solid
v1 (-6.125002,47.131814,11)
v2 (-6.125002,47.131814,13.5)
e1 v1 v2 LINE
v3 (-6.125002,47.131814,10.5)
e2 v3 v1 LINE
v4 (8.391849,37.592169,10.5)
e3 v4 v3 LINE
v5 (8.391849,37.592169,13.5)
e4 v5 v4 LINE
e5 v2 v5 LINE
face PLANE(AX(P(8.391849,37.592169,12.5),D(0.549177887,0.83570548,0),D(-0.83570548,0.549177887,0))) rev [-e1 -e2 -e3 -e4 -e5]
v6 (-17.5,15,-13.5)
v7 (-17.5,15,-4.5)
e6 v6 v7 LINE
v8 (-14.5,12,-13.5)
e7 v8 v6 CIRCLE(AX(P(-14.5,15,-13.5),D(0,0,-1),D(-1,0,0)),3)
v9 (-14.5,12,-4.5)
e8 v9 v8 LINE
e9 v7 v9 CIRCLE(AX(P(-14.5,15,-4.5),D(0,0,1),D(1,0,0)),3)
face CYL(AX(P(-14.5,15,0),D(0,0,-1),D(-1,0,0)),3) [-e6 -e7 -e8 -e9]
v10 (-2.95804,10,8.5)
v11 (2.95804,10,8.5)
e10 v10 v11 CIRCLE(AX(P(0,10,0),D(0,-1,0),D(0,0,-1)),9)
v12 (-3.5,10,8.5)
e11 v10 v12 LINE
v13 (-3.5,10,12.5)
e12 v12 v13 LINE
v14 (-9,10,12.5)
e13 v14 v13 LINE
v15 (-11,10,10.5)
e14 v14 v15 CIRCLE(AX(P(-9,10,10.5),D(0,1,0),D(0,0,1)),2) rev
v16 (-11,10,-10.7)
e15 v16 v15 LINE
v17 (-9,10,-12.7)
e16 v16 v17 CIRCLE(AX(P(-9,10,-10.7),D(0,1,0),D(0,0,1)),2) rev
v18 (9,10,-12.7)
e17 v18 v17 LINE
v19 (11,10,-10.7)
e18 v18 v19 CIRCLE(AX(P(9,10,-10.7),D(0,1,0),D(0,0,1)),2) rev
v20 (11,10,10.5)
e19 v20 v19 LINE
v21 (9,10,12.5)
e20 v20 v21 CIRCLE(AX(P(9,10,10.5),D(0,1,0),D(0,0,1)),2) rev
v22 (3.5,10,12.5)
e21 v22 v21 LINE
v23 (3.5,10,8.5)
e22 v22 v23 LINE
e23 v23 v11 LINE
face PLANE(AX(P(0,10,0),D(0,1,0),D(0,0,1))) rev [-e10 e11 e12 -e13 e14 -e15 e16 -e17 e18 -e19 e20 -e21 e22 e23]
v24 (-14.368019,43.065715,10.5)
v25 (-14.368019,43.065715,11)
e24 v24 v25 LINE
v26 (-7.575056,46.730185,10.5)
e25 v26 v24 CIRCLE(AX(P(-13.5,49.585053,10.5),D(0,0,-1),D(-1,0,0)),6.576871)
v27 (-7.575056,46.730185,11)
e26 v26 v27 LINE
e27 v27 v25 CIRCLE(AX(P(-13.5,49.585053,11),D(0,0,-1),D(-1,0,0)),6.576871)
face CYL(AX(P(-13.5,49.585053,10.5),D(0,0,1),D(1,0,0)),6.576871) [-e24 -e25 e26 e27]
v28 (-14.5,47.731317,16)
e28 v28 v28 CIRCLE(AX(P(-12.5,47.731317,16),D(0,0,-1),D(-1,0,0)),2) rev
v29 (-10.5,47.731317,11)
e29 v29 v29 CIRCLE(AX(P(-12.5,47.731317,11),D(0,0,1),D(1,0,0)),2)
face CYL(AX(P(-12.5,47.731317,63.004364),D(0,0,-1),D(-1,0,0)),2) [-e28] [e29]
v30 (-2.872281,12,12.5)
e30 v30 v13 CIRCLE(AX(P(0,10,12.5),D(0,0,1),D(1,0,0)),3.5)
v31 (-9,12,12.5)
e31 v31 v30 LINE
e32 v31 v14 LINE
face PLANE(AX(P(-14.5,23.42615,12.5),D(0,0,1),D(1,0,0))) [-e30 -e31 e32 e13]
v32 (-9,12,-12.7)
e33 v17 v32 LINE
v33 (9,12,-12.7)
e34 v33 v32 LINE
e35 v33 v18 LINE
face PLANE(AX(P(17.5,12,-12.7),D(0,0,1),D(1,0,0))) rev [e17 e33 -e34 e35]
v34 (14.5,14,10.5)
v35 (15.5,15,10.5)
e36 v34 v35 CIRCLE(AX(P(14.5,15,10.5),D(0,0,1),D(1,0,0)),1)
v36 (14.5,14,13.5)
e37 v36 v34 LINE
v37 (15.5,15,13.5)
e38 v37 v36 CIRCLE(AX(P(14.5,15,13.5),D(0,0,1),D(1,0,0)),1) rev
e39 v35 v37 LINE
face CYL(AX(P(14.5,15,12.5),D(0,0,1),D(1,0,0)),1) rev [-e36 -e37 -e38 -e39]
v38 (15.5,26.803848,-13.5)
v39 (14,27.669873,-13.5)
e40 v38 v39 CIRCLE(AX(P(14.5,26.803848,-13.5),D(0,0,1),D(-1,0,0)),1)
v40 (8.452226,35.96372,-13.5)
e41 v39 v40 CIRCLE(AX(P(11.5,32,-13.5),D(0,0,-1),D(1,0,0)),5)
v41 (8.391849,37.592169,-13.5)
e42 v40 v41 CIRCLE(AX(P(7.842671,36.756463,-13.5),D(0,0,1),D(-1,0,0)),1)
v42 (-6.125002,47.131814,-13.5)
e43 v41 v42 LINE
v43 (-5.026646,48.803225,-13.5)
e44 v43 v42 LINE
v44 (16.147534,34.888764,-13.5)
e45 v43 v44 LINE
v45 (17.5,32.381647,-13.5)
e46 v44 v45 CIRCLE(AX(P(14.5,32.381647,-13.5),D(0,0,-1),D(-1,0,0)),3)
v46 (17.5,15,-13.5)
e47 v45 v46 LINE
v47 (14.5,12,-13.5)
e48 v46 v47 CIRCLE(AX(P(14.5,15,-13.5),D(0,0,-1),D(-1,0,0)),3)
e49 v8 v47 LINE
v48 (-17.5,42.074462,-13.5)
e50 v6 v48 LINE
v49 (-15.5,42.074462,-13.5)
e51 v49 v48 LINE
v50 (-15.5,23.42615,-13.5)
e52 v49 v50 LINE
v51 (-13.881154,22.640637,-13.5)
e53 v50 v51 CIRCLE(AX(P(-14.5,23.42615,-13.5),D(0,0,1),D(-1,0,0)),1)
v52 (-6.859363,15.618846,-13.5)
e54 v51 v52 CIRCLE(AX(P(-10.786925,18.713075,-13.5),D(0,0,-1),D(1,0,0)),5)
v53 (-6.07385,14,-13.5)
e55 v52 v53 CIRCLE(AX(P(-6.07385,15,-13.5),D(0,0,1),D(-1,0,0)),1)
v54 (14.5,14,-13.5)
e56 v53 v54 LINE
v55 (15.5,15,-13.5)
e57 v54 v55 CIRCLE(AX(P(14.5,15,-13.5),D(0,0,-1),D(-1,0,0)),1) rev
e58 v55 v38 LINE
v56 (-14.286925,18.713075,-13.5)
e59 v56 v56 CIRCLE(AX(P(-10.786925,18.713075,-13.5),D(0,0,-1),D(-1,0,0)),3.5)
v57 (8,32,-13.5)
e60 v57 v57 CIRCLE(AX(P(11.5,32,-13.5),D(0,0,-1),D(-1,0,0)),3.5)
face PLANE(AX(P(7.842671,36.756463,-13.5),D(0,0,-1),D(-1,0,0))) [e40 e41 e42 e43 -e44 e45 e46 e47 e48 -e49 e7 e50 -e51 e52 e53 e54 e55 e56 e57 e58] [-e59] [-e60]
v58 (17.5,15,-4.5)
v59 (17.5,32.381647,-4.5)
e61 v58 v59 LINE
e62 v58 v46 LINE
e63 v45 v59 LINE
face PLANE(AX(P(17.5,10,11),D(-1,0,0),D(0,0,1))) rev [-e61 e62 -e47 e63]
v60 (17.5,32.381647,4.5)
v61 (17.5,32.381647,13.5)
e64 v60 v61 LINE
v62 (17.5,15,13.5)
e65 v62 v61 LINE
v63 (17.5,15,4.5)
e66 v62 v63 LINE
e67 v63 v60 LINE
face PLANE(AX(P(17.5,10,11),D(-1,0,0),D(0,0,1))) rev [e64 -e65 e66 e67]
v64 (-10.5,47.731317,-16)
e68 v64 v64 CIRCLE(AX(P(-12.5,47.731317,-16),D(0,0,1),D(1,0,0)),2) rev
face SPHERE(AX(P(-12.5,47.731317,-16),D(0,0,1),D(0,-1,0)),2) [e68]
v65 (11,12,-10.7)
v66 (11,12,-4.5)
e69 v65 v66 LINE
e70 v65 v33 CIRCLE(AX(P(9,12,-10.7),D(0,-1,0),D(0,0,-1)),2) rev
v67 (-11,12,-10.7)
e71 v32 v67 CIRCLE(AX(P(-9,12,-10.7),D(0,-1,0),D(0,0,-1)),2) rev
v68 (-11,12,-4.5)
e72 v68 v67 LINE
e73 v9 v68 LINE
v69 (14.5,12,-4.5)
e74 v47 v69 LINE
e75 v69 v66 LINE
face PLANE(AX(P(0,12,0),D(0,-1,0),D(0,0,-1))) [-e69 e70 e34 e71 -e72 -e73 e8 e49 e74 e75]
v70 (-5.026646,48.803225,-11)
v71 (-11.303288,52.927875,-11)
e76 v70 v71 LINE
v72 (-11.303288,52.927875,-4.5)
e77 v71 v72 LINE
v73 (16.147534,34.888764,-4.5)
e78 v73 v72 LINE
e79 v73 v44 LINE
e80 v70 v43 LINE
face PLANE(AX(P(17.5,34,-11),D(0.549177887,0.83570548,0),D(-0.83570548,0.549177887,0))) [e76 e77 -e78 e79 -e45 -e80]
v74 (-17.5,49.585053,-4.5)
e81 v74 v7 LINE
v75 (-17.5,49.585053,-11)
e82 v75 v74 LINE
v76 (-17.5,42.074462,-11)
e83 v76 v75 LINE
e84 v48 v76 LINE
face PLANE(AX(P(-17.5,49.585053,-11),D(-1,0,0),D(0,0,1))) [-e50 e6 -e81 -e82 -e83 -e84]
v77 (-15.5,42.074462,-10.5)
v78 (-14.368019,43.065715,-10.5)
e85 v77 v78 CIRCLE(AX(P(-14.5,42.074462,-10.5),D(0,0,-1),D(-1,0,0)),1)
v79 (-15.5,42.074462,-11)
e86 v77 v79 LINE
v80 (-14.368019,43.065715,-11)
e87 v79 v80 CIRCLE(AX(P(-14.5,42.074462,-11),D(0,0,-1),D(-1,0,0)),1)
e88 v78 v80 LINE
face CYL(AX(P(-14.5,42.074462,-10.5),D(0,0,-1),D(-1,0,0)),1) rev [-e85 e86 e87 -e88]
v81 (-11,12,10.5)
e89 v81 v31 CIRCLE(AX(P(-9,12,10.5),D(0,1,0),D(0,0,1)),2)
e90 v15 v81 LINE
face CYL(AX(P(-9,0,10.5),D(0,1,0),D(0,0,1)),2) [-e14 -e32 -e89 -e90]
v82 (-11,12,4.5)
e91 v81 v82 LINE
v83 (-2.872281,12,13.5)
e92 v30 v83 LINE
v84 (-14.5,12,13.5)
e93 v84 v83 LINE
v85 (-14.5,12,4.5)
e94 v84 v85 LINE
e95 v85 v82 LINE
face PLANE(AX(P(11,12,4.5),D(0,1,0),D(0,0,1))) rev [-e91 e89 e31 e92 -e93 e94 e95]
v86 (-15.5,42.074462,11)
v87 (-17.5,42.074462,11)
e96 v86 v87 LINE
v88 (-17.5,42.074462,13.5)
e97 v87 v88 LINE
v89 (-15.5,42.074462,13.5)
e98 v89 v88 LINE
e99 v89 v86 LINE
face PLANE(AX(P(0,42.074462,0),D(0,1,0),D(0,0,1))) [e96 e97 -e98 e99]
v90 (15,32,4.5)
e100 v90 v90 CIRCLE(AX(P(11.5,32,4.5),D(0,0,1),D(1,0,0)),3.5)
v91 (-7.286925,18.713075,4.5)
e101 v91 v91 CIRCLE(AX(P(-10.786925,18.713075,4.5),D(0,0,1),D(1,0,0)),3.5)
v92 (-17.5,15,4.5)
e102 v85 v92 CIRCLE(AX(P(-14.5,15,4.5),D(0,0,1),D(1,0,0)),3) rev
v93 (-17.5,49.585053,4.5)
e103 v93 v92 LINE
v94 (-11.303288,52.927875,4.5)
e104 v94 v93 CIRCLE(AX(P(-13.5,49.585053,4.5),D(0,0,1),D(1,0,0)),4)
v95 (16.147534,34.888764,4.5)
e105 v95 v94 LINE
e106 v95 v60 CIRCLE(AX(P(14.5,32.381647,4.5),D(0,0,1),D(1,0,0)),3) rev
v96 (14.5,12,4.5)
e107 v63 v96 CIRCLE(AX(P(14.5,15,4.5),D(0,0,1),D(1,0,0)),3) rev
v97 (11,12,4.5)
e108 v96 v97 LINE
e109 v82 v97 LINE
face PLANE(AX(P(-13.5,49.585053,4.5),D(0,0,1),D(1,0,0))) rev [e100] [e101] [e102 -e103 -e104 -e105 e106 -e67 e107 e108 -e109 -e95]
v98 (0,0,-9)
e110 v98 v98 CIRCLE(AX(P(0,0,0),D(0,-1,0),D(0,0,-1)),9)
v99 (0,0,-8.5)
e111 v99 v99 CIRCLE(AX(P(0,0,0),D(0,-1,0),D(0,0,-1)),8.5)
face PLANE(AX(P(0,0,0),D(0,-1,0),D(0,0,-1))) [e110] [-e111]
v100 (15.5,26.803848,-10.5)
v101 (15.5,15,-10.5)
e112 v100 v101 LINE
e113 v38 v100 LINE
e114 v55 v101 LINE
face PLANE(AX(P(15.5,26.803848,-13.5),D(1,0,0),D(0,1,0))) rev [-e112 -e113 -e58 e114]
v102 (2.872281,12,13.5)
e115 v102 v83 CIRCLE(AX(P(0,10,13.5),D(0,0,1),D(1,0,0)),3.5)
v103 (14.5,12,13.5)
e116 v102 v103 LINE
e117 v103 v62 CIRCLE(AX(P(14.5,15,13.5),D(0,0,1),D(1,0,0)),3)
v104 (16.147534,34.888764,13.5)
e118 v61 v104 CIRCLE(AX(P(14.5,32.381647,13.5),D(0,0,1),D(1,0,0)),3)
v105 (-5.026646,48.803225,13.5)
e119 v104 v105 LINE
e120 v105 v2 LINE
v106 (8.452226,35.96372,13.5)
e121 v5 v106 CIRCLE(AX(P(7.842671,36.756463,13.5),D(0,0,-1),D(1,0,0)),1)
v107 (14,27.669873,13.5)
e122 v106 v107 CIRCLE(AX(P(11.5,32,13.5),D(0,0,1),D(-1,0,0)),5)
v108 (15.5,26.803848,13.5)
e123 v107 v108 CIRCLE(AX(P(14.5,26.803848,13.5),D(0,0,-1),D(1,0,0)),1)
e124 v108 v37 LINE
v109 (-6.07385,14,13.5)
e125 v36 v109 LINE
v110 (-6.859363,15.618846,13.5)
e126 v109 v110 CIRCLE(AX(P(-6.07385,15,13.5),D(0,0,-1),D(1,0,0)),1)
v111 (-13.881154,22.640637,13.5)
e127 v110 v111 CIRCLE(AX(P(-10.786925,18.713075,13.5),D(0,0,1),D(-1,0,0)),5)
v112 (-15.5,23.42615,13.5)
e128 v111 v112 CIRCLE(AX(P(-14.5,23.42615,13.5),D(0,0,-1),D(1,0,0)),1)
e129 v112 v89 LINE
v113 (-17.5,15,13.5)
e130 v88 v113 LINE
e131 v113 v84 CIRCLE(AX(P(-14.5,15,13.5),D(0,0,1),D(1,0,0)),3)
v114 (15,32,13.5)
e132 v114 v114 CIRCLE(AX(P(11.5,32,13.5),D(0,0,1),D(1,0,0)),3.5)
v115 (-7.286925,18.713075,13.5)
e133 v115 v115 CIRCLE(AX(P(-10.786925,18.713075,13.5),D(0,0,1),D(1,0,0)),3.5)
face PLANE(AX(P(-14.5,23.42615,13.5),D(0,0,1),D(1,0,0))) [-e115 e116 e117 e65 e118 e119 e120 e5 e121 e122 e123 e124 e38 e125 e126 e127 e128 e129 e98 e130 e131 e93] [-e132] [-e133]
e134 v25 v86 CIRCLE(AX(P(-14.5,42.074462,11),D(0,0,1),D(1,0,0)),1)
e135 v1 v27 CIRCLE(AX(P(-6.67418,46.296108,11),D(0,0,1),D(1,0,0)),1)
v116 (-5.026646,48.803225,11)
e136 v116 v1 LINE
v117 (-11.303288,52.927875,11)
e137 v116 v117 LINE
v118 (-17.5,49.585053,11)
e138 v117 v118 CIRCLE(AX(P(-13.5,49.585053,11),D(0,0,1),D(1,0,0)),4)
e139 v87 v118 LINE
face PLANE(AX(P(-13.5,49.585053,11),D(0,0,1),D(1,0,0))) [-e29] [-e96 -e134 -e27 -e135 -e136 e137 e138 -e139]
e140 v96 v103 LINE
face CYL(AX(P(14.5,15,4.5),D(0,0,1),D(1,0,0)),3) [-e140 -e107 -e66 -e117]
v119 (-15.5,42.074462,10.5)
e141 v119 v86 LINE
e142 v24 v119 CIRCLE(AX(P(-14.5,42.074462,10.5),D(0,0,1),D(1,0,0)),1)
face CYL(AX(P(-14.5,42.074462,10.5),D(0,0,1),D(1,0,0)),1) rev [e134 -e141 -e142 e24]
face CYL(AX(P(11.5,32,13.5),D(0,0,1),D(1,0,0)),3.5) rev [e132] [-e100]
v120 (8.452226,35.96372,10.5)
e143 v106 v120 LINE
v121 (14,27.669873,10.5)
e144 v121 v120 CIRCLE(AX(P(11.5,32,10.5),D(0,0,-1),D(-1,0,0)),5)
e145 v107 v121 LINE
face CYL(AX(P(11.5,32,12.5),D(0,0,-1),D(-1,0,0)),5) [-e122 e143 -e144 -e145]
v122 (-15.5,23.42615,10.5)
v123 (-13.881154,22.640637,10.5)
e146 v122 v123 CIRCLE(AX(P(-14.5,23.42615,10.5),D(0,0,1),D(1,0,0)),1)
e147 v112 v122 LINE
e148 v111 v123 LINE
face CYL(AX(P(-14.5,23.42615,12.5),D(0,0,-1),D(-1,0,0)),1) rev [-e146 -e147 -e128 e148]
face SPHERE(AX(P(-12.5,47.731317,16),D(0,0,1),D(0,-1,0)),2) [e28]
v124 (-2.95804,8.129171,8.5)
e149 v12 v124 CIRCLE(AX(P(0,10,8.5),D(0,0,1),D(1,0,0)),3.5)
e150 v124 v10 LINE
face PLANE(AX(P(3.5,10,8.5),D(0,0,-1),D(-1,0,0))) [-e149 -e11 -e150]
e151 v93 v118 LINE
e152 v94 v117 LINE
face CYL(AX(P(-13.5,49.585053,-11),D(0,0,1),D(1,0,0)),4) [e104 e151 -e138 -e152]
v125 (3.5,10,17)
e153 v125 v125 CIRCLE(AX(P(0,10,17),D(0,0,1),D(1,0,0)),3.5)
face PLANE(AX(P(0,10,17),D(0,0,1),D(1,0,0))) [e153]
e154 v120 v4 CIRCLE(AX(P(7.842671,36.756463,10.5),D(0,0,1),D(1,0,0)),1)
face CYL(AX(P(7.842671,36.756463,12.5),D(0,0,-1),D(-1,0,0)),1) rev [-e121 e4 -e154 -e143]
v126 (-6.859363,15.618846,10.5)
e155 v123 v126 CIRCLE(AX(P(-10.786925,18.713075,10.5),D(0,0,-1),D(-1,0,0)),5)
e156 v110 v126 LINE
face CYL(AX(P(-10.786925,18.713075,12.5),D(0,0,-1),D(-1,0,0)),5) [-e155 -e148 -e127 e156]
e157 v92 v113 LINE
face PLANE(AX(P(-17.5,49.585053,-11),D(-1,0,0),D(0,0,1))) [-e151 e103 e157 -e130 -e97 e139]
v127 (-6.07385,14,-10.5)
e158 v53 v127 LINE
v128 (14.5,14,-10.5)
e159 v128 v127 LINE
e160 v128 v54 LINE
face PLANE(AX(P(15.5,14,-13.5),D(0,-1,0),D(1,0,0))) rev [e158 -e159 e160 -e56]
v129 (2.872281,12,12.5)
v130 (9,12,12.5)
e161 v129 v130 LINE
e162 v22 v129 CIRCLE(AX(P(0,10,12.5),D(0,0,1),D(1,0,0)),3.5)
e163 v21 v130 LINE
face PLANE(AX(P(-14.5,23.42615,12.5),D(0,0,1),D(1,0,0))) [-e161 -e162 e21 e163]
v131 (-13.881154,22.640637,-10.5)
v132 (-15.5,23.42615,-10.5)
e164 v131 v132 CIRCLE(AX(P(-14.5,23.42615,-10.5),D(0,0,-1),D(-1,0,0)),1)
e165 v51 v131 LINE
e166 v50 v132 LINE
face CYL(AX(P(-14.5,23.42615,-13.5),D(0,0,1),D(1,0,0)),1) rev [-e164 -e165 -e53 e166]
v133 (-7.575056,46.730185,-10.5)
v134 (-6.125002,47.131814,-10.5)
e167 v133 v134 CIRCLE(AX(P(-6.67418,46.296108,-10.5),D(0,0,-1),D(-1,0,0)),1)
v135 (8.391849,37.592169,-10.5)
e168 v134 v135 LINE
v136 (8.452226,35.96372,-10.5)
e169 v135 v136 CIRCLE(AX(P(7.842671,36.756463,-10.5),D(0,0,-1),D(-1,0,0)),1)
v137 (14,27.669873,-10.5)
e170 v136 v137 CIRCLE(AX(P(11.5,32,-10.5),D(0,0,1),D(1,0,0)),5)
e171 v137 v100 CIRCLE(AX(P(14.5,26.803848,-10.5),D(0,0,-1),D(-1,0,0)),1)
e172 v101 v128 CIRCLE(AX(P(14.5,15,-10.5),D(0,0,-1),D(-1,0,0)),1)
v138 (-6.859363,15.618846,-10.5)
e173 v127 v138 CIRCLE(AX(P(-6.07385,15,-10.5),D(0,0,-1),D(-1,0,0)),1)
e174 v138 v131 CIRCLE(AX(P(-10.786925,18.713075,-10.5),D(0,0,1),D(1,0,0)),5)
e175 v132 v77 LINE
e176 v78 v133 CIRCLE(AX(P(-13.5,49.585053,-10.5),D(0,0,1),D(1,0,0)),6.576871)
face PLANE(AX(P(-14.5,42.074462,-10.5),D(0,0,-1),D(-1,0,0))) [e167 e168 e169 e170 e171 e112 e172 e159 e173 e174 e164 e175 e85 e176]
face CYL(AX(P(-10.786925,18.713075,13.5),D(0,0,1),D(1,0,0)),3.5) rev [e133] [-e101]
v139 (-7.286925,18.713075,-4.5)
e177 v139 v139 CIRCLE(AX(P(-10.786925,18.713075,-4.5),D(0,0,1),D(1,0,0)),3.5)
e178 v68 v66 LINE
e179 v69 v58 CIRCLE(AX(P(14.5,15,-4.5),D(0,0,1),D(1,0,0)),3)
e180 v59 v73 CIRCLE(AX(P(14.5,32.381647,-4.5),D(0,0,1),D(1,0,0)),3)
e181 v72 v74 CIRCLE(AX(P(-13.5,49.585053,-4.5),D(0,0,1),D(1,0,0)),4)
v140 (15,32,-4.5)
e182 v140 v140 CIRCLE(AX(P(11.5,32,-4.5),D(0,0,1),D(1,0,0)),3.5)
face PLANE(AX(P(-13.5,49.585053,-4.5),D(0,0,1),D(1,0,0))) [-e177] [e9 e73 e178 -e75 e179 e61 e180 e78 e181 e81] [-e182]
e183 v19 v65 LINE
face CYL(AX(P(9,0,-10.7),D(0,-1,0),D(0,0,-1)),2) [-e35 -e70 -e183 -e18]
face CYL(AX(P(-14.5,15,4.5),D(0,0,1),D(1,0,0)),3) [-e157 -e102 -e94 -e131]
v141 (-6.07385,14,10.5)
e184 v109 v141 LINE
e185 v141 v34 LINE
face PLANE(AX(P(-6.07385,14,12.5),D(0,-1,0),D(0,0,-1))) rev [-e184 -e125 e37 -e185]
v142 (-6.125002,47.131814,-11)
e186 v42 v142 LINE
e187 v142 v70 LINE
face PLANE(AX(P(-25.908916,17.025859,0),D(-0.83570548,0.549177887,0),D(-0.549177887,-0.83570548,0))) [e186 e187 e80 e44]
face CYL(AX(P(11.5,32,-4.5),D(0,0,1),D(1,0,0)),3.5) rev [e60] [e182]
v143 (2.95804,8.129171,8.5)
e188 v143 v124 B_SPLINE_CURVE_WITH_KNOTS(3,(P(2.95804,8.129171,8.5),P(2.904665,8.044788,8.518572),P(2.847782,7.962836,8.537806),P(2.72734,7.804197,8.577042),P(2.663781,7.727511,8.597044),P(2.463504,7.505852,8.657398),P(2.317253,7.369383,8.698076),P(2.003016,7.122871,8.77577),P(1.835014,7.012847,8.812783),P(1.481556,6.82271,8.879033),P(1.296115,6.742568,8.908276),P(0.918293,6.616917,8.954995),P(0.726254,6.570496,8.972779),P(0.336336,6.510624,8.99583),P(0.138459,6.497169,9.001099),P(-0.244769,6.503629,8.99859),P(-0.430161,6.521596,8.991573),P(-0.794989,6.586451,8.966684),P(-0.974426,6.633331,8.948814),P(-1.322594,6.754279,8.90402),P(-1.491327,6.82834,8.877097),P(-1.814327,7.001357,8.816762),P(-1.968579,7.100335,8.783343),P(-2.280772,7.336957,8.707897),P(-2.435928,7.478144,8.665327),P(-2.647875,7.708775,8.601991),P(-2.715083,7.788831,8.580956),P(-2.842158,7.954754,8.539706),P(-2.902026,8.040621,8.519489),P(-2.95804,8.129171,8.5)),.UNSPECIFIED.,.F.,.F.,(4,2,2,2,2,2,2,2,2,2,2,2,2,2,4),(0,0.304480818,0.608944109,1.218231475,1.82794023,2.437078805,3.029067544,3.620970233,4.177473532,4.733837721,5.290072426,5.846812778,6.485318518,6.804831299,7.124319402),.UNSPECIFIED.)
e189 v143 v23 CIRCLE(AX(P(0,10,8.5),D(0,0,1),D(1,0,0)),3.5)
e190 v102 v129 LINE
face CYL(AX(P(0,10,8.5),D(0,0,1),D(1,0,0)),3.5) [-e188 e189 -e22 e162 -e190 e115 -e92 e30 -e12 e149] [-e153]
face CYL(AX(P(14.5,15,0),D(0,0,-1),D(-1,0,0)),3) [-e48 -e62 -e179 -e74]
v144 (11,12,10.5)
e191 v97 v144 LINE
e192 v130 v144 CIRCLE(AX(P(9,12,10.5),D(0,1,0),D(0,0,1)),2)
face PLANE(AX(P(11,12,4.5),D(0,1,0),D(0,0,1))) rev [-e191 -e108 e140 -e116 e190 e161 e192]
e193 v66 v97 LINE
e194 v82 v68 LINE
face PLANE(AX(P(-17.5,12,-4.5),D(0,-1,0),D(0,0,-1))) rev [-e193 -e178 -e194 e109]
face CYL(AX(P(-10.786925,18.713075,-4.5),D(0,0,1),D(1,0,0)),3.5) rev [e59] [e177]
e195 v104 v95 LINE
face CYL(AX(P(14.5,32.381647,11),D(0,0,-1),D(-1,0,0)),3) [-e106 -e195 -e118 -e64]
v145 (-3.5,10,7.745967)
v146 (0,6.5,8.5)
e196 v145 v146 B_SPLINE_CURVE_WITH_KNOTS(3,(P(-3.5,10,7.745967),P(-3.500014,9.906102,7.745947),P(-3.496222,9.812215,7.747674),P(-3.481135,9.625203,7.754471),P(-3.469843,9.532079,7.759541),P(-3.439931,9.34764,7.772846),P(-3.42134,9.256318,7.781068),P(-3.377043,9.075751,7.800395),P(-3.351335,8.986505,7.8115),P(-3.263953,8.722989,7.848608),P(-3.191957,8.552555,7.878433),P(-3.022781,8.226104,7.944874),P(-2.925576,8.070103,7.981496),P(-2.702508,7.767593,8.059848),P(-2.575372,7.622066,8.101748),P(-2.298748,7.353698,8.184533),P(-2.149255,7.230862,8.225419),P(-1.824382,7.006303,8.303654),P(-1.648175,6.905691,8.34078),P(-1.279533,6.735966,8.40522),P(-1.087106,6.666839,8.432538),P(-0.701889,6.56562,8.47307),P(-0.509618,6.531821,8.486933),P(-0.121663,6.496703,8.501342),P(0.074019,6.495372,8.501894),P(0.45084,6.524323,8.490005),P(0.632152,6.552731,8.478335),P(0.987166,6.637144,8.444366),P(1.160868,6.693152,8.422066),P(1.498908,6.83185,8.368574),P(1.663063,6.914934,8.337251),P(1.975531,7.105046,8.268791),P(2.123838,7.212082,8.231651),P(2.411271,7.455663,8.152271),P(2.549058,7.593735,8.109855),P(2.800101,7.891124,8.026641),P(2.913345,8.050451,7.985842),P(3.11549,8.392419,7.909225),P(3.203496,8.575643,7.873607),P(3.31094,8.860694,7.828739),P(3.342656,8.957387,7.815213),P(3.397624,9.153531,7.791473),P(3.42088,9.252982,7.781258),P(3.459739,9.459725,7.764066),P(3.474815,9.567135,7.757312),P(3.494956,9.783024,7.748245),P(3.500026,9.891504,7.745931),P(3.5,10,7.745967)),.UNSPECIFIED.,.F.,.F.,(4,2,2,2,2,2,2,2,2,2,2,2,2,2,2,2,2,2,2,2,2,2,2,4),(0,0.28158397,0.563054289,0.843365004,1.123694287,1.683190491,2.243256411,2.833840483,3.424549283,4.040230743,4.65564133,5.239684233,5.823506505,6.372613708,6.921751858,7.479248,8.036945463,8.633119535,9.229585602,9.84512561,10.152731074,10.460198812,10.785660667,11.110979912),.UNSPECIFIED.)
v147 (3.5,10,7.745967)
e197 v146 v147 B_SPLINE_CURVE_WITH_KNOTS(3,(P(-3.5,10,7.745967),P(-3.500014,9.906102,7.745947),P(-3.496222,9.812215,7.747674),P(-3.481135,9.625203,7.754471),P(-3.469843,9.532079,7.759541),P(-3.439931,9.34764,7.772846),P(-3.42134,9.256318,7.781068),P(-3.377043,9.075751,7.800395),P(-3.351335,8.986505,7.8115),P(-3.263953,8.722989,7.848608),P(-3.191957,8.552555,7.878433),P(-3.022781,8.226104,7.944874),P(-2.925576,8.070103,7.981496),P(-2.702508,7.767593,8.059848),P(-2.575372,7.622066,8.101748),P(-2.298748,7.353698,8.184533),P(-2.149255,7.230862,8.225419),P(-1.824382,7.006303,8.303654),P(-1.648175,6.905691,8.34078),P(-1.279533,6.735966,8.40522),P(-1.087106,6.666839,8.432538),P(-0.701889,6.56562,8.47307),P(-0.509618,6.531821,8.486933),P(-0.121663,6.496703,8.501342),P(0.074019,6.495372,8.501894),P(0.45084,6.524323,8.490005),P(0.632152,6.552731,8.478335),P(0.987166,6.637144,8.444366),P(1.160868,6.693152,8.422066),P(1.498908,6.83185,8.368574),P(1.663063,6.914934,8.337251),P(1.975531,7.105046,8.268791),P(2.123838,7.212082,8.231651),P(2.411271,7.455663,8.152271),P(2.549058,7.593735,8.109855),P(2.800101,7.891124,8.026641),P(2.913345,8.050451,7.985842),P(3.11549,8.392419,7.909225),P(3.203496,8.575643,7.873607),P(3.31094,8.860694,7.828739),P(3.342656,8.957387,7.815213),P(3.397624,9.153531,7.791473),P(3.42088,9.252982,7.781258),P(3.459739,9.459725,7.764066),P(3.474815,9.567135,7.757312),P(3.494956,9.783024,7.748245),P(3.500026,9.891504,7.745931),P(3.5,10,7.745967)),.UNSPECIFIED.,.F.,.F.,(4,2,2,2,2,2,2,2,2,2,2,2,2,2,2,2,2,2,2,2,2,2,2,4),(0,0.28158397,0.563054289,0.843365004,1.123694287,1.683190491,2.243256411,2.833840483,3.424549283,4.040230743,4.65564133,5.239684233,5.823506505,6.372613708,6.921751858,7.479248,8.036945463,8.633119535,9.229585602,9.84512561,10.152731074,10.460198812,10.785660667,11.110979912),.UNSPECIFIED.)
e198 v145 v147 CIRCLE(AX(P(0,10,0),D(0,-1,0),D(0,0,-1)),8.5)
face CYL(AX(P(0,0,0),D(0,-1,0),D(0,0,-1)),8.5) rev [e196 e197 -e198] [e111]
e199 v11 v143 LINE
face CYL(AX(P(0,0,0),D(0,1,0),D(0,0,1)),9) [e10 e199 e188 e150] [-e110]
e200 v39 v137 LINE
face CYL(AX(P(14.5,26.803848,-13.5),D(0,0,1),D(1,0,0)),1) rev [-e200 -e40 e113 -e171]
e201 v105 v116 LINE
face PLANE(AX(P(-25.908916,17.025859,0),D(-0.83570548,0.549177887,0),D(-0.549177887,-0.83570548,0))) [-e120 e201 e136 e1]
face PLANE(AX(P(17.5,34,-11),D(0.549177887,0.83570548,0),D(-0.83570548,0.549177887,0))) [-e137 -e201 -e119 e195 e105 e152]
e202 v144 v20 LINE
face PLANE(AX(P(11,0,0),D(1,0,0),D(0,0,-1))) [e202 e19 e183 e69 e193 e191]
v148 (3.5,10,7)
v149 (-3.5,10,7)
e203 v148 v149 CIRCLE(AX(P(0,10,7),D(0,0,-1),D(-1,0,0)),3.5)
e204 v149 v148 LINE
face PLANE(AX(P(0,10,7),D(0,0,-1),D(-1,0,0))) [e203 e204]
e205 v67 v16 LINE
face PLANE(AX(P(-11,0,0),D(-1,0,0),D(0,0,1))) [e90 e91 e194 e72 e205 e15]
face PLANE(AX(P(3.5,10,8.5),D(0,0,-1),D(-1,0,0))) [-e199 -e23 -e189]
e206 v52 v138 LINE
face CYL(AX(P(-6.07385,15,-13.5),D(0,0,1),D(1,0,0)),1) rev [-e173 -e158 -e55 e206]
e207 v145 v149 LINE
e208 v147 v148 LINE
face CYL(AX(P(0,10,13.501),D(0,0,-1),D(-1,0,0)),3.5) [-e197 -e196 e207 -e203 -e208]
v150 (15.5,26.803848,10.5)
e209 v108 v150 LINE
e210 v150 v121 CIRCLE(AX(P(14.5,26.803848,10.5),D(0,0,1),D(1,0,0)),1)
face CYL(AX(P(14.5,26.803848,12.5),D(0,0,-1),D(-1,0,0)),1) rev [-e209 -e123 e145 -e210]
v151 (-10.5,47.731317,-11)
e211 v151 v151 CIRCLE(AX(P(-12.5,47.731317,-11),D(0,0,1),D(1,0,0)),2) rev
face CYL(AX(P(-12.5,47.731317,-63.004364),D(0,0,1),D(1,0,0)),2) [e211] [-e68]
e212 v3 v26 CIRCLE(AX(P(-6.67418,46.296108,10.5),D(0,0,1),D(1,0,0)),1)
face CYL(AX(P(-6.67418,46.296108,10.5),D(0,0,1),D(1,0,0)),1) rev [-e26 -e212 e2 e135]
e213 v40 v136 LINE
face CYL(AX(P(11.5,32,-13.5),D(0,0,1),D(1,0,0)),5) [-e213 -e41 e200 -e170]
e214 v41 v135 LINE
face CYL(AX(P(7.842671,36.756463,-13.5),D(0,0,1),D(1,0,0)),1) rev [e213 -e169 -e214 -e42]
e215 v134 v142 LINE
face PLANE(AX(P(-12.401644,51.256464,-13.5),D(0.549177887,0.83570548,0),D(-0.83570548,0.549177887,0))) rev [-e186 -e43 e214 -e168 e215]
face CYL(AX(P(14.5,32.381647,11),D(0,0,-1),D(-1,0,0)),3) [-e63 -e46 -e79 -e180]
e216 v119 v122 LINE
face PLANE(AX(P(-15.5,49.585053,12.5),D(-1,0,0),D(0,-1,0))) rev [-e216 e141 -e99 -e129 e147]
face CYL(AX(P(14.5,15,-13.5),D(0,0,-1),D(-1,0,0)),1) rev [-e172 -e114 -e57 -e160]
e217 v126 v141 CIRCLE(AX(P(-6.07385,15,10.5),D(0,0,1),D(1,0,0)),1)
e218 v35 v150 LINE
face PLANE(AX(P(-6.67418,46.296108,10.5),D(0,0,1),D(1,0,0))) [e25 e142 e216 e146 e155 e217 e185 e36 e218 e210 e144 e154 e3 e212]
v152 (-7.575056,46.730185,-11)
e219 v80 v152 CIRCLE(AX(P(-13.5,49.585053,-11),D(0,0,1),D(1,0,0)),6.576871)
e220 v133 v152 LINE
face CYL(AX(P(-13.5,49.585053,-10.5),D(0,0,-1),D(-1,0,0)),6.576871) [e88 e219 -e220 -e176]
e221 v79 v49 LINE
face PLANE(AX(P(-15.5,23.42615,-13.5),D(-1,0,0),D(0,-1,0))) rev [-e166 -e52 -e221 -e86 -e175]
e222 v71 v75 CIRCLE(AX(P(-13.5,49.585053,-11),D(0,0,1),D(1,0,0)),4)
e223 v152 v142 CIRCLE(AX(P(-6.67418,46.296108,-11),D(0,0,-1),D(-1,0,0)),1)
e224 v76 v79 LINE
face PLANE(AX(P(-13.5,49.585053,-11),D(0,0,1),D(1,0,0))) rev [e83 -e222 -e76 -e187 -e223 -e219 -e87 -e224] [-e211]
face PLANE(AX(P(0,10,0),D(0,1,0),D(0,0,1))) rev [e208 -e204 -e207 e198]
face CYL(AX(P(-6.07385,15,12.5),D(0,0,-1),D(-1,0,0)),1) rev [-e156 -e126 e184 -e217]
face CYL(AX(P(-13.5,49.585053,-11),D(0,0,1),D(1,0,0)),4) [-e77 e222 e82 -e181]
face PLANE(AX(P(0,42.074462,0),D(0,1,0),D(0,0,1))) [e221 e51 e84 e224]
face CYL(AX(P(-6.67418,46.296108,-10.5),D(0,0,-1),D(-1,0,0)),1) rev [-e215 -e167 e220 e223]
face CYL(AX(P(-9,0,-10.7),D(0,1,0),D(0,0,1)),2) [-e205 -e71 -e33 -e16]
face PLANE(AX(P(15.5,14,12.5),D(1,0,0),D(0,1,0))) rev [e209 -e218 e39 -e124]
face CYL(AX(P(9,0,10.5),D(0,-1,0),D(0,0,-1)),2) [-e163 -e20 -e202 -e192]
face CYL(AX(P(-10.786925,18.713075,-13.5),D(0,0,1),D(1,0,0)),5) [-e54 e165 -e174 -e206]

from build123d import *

# Parameters (mm, degrees)
BOSS_EXTRUDE1_DEPTH            = 22
SKETCH2_W                      = 35
SKETCH2_H                      = 22
BOSS_EXTRUDE2_DEPTH            = 24
BOSS_EXTRUDE3_DEPTH            = 1.5
BOSS_EXTRUDE4_START            = 2.5
BOSS_EXTRUDE4_DEPTH            = 2.5
CUT_EXTRUDE1_DEPTH             = 9
SKETCH6_W                      = 35
SKETCH6_H                      = 0.8
CUT_EXTRUDE2_DEPTH             = 2
SKETCH7_W                      = 2
SKETCH7_H                      = 1.5
CUT_EXTRUDE3_DEPTH             = 7.510590912
SKETCH8_W                      = 1.5
SKETCH8_H                      = 2
CUT_EXTRUDE4_DEPTH             = 7.510590912
SKETCH9_W                      = 2
SKETCH9_H                      = 2.5
CUT_EXTRUDE5_DEPTH             = 7.510590912
SKETCH10_W                     = 2.5
SKETCH10_H                     = 2
CUT_EXTRUDE6_DEPTH             = 7.510590912
CUT_EXTRUDE7_DEPTH             = 6.5
CUT_EXTRUDE8_DEPTH             = 6.5
BOSS_EXTRUDE5_DEPTH            = 1
CUT_EXTRUDE9_DEPTH             = 0.5
CUT_EXTRUDE10_START            = -0.5
CUT_EXTRUDE10_DEPTH            = 0.5
SKETCH16_R                     = 9
BOSS_EXTRUDE6_DEPTH            = 10
F_17_0_17_DIAMETER_HOLE1_D     = 17
F_17_0_17_DIAMETER_HOLE1_DEPTH = 10
BOSS_EXTRUDE7_REACH            = 61.982
BOSS_EXTRUDE7_END_RADIUS       = 8.5
SKETCH22_W                     = 3.5
SKETCH22_H                     = 8.5
F_7_0_7_DIAMETER_HOLE1_D       = 7
F_7_0_7_DIAMETER_HOLE1_DEPTH   = 9
F_7_0_7_DIAMETER_HOLE2_D       = 7
F_7_0_7_DIAMETER_HOLE2_DEPTH   = 13.5
FILLET1_R                      = 1
FILLET2_R                      = 2
FILLET3_R                      = 3


# Read off the part's stored shape, not the designer's step: Boss-Extrude8, Boss-Extrude9
with BuildPart() as part:
    # Sketch1 → Boss-Extrude1 (new body)
    with BuildSketch(Plane.XY.offset(11)):
        with BuildLine():
            Line((-17.5, 34), (17.5, 34))
            Line((17.5, 34), (-11.303288453, 52.927875269))
            ThreePointArc((-11.303288453, 52.927875269), (-15.399098972, 53.105482741), (-17.5, 49.585053351))
            Line((-17.5, 49.585053351), (-17.5, 34))
        make_face()
    extrude(amount=-BOSS_EXTRUDE1_DEPTH)

    # Sketch2 → Boss-Extrude2 (add)
    with BuildSketch(Plane.XZ.offset(-34)):
        Rectangle(SKETCH2_W, SKETCH2_H)
    extrude(amount=BOSS_EXTRUDE2_DEPTH)

    # Sketch3 → Boss-Extrude3 (add)
    with BuildSketch(Plane.XY.offset(11)):
        with BuildLine():
            Line((17.5, 10), (-17.5, 10))
            Line((-17.5, 10), (-17.5, 49.585053351))
            Line((-17.5, 49.585053351), (-15.5, 49.585053351))
            Line((-15.5, 49.585053351), (-15.5, 23.426149773))
            ThreePointArc((-15.5, 23.426149773), (-14.936551363, 22.526470437), (-13.881154186, 22.640637292))
            ThreePointArc((-13.881154186, 22.640637292), (-7.251391207, 22.248608793), (-6.859362708, 15.618845814))
            ThreePointArc((-6.859362708, 15.618845814), (-6.973529563, 14.563448637), (-6.073850227, 14))
            Line((-6.073850227, 14), (15.5, 14))
            Line((15.5, 14), (15.5, 26.803847577))
            ThreePointArc((15.5, 26.803847577), (15, 27.669872981), (14, 27.669872981))
            ThreePointArc((14, 27.669872981), (7.344042027, 29.220069546), (8.452225776, 35.963719501))
            ThreePointArc((8.452225776, 35.963719501), (8.841984311, 36.793514293), (8.391848818, 37.592168881))
            Line((8.391848818, 37.592168881), (-12.401644227, 51.25646431))
            Line((-12.401644227, 51.25646431), (-11.303288453, 52.927875269))
            Line((-11.303288453, 52.927875269), (17.5, 34))
            Line((17.5, 34), (17.5, 10))
        make_face()
    extrude(amount=BOSS_EXTRUDE3_DEPTH)

    # Sketch4 → Boss-Extrude4 (add)
    with BuildSketch(Plane(origin=(0, 0, -11), x_dir=(-1, 0, 0), z_dir=(0, 0, -1)).offset(BOSS_EXTRUDE4_START)):
        with BuildLine():
            Line((12.401644227, 51.25646431), (-8.391848818, 37.592168881))
            ThreePointArc((-8.391848818, 37.592168881), (-8.841984311, 36.793514293), (-8.452225776, 35.963719501))
            ThreePointArc((-8.452225776, 35.963719501), (-7.344042027, 29.220069546), (-14, 27.669872981))
            ThreePointArc((-14, 27.669872981), (-15, 27.669872981), (-15.5, 26.803847577))
            Line((-15.5, 26.803847577), (-15.5, 14))
            Line((-15.5, 14), (6.073850227, 14))
            ThreePointArc((6.073850227, 14), (6.973529563, 14.563448637), (6.859362708, 15.618845814))
            ThreePointArc((6.859362708, 15.618845814), (7.251391207, 22.248608793), (13.881154186, 22.640637292))
            ThreePointArc((13.881154186, 22.640637292), (14.936551363, 22.526470437), (15.5, 23.426149773))
            Line((15.5, 23.426149773), (15.5, 49.585053351))
            Line((15.5, 49.585053351), (17.5, 49.585053351))
            Line((17.5, 49.585053351), (17.5, 10))
            Line((17.5, 10), (-17.5, 10))
            Line((-17.5, 10), (-17.5, 34))
            Line((-17.5, 34), (11.303288453, 52.927875269))
            Line((11.303288453, 52.927875269), (12.401644227, 51.25646431))
        make_face()
    extrude(amount=-BOSS_EXTRUDE4_DEPTH)

    # Sketch5 → Cut-Extrude1 (cut)
    with BuildSketch(Plane.XY.offset(4.5)):
        with BuildLine():
            Line((-17.5, 49.585053351), (-17.5, 12))
            Line((-17.5, 12), (17.5, 12))
            Line((17.5, 12), (17.5, 34))
            Line((17.5, 34), (-11.303288453, 52.927875269))
            ThreePointArc((-11.303288453, 52.927875269), (-15.399098972, 53.105482741), (-17.5, 49.585053351))
        make_face()
    extrude(amount=-CUT_EXTRUDE1_DEPTH, mode=Mode.SUBTRACT)

    # Sketch6 → Cut-Extrude2 (cut)
    with BuildSketch(Plane.XZ.offset(-10)):
        with Locations((0, -13.1)):
            Rectangle(SKETCH6_W, SKETCH6_H)
    extrude(amount=-CUT_EXTRUDE2_DEPTH, mode=Mode.SUBTRACT)

    # Sketch7 → Cut-Extrude3 (cut)
    with BuildSketch(Plane(origin=(0, 49.585053351, 0), x_dir=(-1, 0, 0), z_dir=(0, 1, 0))):
        with Locations((16.5, 11.75)):
            Rectangle(SKETCH7_W, SKETCH7_H)
    extrude(amount=-CUT_EXTRUDE3_DEPTH, mode=Mode.SUBTRACT)

    # Sketch8 → Cut-Extrude4 (cut)
    with BuildSketch(Plane(origin=(-32.185557553, 21.150509249, 0), x_dir=(0, 0, 1), z_dir=(-0.8357054797012744, 0.5491778866608367, 0))):
        with Locations((11.75, 37.024599326)):
            Rectangle(SKETCH8_W, SKETCH8_H)
    extrude(amount=-CUT_EXTRUDE4_DEPTH, mode=Mode.SUBTRACT)

    # Sketch9 → Cut-Extrude5 (cut)
    with BuildSketch(Plane(origin=(0, 49.585053351, 0), x_dir=(-1, 0, 0), z_dir=(0, 1, 0))):
        with Locations((16.5, -12.25)):
            Rectangle(SKETCH9_W, SKETCH9_H)
    extrude(amount=-CUT_EXTRUDE5_DEPTH, mode=Mode.SUBTRACT)

    # Sketch10 → Cut-Extrude6 (cut)
    with BuildSketch(Plane(origin=(-32.185557553, 21.150509249, 0), x_dir=(0, 0, 1), z_dir=(-0.8357054797012744, 0.5491778866608367, 0))):
        with Locations((-12.25, 37.024599326)):
            Rectangle(SKETCH10_W, SKETCH10_H)
    extrude(amount=-CUT_EXTRUDE6_DEPTH, mode=Mode.SUBTRACT)

    # Sketch11 → Cut-Extrude7 (cut)
    with BuildSketch(Plane(origin=(17.5, 0, 0), x_dir=(0, 0, -1), z_dir=(1, 0, 0))):
        Polygon((-12.5, 10), (12.7, 10), (12.7, 12), (4.5, 12), (-4.5, 12), (-12.5, 12), align=None)
    extrude(amount=-CUT_EXTRUDE7_DEPTH, mode=Mode.SUBTRACT)

    # Sketch12 → Cut-Extrude8 (cut)
    with BuildSketch(Plane.ZY.offset(17.5)):
        Polygon((-4.5, 12), (-12.7, 12), (-12.7, 10), (12.5, 10), (12.5, 12), (4.5, 12), align=None)
    extrude(amount=-CUT_EXTRUDE8_DEPTH, mode=Mode.SUBTRACT)

    # Sketch13 → Boss-Extrude5 (add)
    with BuildSketch(Plane.XY.offset(12.5)):
        with BuildLine():
            Line((17.5, 12), (-17.5, 12))
            Line((-17.5, 12), (-17.5, 42.074462439))
            Line((-17.5, 42.074462439), (-15.5, 42.074462439))
            Line((-15.5, 42.074462439), (-15.5, 23.426149773))
            ThreePointArc((-15.5, 23.426149773), (-14.936551363, 22.526470437), (-13.881154186, 22.640637292))
            ThreePointArc((-13.881154186, 22.640637292), (-7.251391207, 22.248608793), (-6.859362708, 15.618845814))
            ThreePointArc((-6.859362708, 15.618845814), (-6.973529563, 14.563448637), (-6.073850227, 14))
            Line((-6.073850227, 14), (15.5, 14))
            Line((15.5, 14), (15.5, 26.803847577))
            ThreePointArc((15.5, 26.803847577), (15, 27.669872981), (14, 27.669872981))
            ThreePointArc((14, 27.669872981), (7.344042027, 29.220069546), (8.452225776, 35.963719501))
            ThreePointArc((8.452225776, 35.963719501), (8.841984311, 36.793514293), (8.391848818, 37.592168881))
            Line((8.391848818, 37.592168881), (-6.125002246, 47.131813865))
            Line((-6.125002246, 47.131813865), (-5.026646473, 48.803224825))
            Line((-5.026646473, 48.803224825), (17.5, 34))
            Line((17.5, 34), (17.5, 12))
        make_face()
    extrude(amount=BOSS_EXTRUDE5_DEPTH)

    # Sketch14 → Cut-Extrude9 (cut)
    with BuildSketch(Plane(origin=(0, 0, -11), x_dir=(-1, 0, 0), z_dir=(0, 0, -1))):
        with BuildLine():
            Line((6.125002246, 47.131813865), (-8.391848818, 37.592168881))
            ThreePointArc((-8.391848818, 37.592168881), (-8.841984311, 36.793514293), (-8.452225776, 35.963719501))
            ThreePointArc((-8.452225776, 35.963719501), (-7.344042027, 29.220069546), (-14, 27.669872981))
            ThreePointArc((-14, 27.669872981), (-15, 27.669872981), (-15.5, 26.803847577))
            Line((-15.5, 26.803847577), (-15.5, 14))
            Line((-15.5, 14), (6.073850227, 14))
            ThreePointArc((6.073850227, 14), (6.973529563, 14.563448637), (6.859362708, 15.618845814))
            ThreePointArc((6.859362708, 15.618845814), (7.251391207, 22.248608793), (13.881154186, 22.640637292))
            ThreePointArc((13.881154186, 22.640637292), (14.936551363, 22.526470437), (15.5, 23.426149773))
            Line((15.5, 23.426149773), (15.5, 42.074462439))
            ThreePointArc((15.5, 42.074462439), (15.158794125, 42.826785707), (14.368019399, 43.065714738))
            ThreePointArc((14.368019399, 43.065714738), (10.377467708, 43.796700761), (7.575055938, 46.730185317))
            ThreePointArc((7.575055938, 46.730185317), (6.941105645, 47.259825549), (6.125002246, 47.131813865))
        make_face()
    extrude(amount=-CUT_EXTRUDE9_DEPTH, mode=Mode.SUBTRACT)

    # Sketch15 → Cut-Extrude10 (cut)
    with BuildSketch(Plane.XY.offset(11).offset(CUT_EXTRUDE10_START)):
        with BuildLine():
            Line((-15.5, 42.074462439), (-15.5, 23.426149773))
            ThreePointArc((-15.5, 23.426149773), (-14.936551363, 22.526470437), (-13.881154186, 22.640637292))
            ThreePointArc((-13.881154186, 22.640637292), (-7.251391207, 22.248608793), (-6.859362708, 15.618845814))
            ThreePointArc((-6.859362708, 15.618845814), (-6.973529563, 14.563448637), (-6.073850227, 14))
            Line((-6.073850227, 14), (15.5, 14))
            Line((15.5, 14), (15.5, 26.803847577))
            ThreePointArc((15.5, 26.803847577), (15, 27.669872981), (14, 27.669872981))
            ThreePointArc((14, 27.669872981), (7.344042027, 29.220069546), (8.452225776, 35.963719501))
            ThreePointArc((8.452225776, 35.963719501), (8.841984311, 36.793514293), (8.391848818, 37.592168881))
            Line((8.391848818, 37.592168881), (-6.125002246, 47.131813865))
            ThreePointArc((-6.125002246, 47.131813865), (-6.941105645, 47.259825549), (-7.575055938, 46.730185317))
            ThreePointArc((-7.575055938, 46.730185317), (-10.377467708, 43.796700761), (-14.368019399, 43.065714738))
            ThreePointArc((-14.368019399, 43.065714738), (-15.158794125, 42.826785707), (-15.5, 42.074462439))
        make_face()
    extrude(amount=CUT_EXTRUDE10_DEPTH, mode=Mode.SUBTRACT)

    # Sketch16 → Boss-Extrude6 (add)
    with BuildSketch(Plane.XZ.offset(-10)):
        with Locations(Location((0, 0, 0), (0, 0, 270))):
            Circle(SKETCH16_R)
    extrude(amount=BOSS_EXTRUDE6_DEPTH)

    # Ø17.0 (17) Diameter Hole1
    with Locations(Plane(origin=(0, 0, 0), x_dir=(-1, 0, 0), z_dir=(0, -1, 0))):
        with Locations((0, 0)):
            Hole(F_17_0_17_DIAMETER_HOLE1_D / 2, depth=F_17_0_17_DIAMETER_HOLE1_DEPTH)

    # Boss-Extrude7: up to this cylinder (the profile starts inside it)
    boss_extrude7_end = Plane(origin=(0, 8.514554, 0), z_dir=(0, -1, 0)) * Cylinder(BOSS_EXTRUDE7_END_RADIUS, 141.964, mode=Mode.PRIVATE)
    # Sketch19 → Boss-Extrude7 (add, up to the surface)
    with BuildSketch(Plane(origin=(0, 0, 7), x_dir=(-1, 0, 0), z_dir=(0, 0, -1)), mode=Mode.PRIVATE) as boss_extrude7_sk1:
        with BuildLine():
            Line((3.5, 10), (-3.5, 10))
            ThreePointArc((-3.5, 10), (0, 6.5), (3.5, 10))
        make_face()
    boss_extrude7_tool1 = extrude(boss_extrude7_sk1.sketch, amount=-BOSS_EXTRUDE7_REACH, mode=Mode.PRIVATE) & boss_extrude7_end
    add(boss_extrude7_tool1.solids().sort_by_distance((0, 8.514554, 7))[0])

    # Boss-Extrude8 outline → Boss-Extrude8 (revolve)
    with BuildSketch(Plane(origin=(-12.5, 47.731316688, 0), x_dir=(1, 0, 0), z_dir=(0, -1, 0))):
        with BuildLine():
            ThreePointArc((0, -18), (1.414213563, -17.414213562), (2, -15.999999998))
            Line((2, -15.999999998), (2, -11))
            Line((2, -11), (0, -11))
            Line((0, -11), (0, -18))
        make_face()
    revolve(axis=Axis((-12.5, 47.731316688, 0), (0, 0, 1)))

    # Boss-Extrude9 outline → Boss-Extrude9 (revolve)
    with BuildSketch(Plane(origin=(-12.5, 47.731316688, 0), x_dir=(1, 0, 0), z_dir=(0, -1, 0))):
        with BuildLine():
            Line((2, 11), (2, 15.999999998))
            ThreePointArc((2, 15.999999998), (1.414213563, 17.414213562), (0, 18))
            Line((0, 18), (0, 11))
            Line((0, 11), (2, 11))
        make_face()
    revolve(axis=Axis((-12.5, 47.731316688, 0), (0, 0, 1)))

    # Sketch22 → Revolve1 (revolve)
    with BuildSketch(Plane(origin=(0, 10, 0), x_dir=(1, 0, 0), z_dir=(0, 1, 0))):
        with Locations((1.75, -12.75)):
            Rectangle(SKETCH22_W, SKETCH22_H)
    revolve(axis=Axis((0, 10, 8.5), (0, 0, 1)))

    # Ø7.0 (7) Diameter Hole1
    with Locations(Plane.XY.offset(13.5)):
        with Locations((-10.786925113, 18.713074887), (11.5, 32)):
            Hole(F_7_0_7_DIAMETER_HOLE1_D / 2, depth=F_7_0_7_DIAMETER_HOLE1_DEPTH)

    # Ø7.0 (7) Diameter Hole2
    with Locations(Plane.XY.offset(-4.5)):
        with Locations((-10.786925113, 18.713074887), (11.5, 32)):
            Hole(F_7_0_7_DIAMETER_HOLE2_D / 2, depth=F_7_0_7_DIAMETER_HOLE2_DEPTH)

    # Fillet1
    fillet1_edges = [part.edges().sort_by_distance(p)[0] for p in [
        (15.5, 14, 12),
        (15.5, 14, -12),
    ]]
    fillet(fillet1_edges, radius=FILLET1_R)

    # Fillet2
    fillet2_edges = [part.edges().sort_by_distance(p)[0] for p in [
        (11, 11, 12.5),
        (11, 11, -12.7),
        (-11, 11, 12.5),
        (-11, 11, -12.7),
    ]]
    fillet(fillet2_edges, radius=FILLET2_R)

    # Fillet3
    fillet3_edges = [part.edges().sort_by_distance(p)[0] for p in [
        (17.5, 34, 9),
        (-17.5, 12, -9),
        (17.5, 12, -9),
        (17.5, 12, 9),
        (-17.5, 12, 9),
        (17.5, 34, -9),
    ]]
    fillet(fillet3_edges, radius=FILLET3_R)


solid = part.part
